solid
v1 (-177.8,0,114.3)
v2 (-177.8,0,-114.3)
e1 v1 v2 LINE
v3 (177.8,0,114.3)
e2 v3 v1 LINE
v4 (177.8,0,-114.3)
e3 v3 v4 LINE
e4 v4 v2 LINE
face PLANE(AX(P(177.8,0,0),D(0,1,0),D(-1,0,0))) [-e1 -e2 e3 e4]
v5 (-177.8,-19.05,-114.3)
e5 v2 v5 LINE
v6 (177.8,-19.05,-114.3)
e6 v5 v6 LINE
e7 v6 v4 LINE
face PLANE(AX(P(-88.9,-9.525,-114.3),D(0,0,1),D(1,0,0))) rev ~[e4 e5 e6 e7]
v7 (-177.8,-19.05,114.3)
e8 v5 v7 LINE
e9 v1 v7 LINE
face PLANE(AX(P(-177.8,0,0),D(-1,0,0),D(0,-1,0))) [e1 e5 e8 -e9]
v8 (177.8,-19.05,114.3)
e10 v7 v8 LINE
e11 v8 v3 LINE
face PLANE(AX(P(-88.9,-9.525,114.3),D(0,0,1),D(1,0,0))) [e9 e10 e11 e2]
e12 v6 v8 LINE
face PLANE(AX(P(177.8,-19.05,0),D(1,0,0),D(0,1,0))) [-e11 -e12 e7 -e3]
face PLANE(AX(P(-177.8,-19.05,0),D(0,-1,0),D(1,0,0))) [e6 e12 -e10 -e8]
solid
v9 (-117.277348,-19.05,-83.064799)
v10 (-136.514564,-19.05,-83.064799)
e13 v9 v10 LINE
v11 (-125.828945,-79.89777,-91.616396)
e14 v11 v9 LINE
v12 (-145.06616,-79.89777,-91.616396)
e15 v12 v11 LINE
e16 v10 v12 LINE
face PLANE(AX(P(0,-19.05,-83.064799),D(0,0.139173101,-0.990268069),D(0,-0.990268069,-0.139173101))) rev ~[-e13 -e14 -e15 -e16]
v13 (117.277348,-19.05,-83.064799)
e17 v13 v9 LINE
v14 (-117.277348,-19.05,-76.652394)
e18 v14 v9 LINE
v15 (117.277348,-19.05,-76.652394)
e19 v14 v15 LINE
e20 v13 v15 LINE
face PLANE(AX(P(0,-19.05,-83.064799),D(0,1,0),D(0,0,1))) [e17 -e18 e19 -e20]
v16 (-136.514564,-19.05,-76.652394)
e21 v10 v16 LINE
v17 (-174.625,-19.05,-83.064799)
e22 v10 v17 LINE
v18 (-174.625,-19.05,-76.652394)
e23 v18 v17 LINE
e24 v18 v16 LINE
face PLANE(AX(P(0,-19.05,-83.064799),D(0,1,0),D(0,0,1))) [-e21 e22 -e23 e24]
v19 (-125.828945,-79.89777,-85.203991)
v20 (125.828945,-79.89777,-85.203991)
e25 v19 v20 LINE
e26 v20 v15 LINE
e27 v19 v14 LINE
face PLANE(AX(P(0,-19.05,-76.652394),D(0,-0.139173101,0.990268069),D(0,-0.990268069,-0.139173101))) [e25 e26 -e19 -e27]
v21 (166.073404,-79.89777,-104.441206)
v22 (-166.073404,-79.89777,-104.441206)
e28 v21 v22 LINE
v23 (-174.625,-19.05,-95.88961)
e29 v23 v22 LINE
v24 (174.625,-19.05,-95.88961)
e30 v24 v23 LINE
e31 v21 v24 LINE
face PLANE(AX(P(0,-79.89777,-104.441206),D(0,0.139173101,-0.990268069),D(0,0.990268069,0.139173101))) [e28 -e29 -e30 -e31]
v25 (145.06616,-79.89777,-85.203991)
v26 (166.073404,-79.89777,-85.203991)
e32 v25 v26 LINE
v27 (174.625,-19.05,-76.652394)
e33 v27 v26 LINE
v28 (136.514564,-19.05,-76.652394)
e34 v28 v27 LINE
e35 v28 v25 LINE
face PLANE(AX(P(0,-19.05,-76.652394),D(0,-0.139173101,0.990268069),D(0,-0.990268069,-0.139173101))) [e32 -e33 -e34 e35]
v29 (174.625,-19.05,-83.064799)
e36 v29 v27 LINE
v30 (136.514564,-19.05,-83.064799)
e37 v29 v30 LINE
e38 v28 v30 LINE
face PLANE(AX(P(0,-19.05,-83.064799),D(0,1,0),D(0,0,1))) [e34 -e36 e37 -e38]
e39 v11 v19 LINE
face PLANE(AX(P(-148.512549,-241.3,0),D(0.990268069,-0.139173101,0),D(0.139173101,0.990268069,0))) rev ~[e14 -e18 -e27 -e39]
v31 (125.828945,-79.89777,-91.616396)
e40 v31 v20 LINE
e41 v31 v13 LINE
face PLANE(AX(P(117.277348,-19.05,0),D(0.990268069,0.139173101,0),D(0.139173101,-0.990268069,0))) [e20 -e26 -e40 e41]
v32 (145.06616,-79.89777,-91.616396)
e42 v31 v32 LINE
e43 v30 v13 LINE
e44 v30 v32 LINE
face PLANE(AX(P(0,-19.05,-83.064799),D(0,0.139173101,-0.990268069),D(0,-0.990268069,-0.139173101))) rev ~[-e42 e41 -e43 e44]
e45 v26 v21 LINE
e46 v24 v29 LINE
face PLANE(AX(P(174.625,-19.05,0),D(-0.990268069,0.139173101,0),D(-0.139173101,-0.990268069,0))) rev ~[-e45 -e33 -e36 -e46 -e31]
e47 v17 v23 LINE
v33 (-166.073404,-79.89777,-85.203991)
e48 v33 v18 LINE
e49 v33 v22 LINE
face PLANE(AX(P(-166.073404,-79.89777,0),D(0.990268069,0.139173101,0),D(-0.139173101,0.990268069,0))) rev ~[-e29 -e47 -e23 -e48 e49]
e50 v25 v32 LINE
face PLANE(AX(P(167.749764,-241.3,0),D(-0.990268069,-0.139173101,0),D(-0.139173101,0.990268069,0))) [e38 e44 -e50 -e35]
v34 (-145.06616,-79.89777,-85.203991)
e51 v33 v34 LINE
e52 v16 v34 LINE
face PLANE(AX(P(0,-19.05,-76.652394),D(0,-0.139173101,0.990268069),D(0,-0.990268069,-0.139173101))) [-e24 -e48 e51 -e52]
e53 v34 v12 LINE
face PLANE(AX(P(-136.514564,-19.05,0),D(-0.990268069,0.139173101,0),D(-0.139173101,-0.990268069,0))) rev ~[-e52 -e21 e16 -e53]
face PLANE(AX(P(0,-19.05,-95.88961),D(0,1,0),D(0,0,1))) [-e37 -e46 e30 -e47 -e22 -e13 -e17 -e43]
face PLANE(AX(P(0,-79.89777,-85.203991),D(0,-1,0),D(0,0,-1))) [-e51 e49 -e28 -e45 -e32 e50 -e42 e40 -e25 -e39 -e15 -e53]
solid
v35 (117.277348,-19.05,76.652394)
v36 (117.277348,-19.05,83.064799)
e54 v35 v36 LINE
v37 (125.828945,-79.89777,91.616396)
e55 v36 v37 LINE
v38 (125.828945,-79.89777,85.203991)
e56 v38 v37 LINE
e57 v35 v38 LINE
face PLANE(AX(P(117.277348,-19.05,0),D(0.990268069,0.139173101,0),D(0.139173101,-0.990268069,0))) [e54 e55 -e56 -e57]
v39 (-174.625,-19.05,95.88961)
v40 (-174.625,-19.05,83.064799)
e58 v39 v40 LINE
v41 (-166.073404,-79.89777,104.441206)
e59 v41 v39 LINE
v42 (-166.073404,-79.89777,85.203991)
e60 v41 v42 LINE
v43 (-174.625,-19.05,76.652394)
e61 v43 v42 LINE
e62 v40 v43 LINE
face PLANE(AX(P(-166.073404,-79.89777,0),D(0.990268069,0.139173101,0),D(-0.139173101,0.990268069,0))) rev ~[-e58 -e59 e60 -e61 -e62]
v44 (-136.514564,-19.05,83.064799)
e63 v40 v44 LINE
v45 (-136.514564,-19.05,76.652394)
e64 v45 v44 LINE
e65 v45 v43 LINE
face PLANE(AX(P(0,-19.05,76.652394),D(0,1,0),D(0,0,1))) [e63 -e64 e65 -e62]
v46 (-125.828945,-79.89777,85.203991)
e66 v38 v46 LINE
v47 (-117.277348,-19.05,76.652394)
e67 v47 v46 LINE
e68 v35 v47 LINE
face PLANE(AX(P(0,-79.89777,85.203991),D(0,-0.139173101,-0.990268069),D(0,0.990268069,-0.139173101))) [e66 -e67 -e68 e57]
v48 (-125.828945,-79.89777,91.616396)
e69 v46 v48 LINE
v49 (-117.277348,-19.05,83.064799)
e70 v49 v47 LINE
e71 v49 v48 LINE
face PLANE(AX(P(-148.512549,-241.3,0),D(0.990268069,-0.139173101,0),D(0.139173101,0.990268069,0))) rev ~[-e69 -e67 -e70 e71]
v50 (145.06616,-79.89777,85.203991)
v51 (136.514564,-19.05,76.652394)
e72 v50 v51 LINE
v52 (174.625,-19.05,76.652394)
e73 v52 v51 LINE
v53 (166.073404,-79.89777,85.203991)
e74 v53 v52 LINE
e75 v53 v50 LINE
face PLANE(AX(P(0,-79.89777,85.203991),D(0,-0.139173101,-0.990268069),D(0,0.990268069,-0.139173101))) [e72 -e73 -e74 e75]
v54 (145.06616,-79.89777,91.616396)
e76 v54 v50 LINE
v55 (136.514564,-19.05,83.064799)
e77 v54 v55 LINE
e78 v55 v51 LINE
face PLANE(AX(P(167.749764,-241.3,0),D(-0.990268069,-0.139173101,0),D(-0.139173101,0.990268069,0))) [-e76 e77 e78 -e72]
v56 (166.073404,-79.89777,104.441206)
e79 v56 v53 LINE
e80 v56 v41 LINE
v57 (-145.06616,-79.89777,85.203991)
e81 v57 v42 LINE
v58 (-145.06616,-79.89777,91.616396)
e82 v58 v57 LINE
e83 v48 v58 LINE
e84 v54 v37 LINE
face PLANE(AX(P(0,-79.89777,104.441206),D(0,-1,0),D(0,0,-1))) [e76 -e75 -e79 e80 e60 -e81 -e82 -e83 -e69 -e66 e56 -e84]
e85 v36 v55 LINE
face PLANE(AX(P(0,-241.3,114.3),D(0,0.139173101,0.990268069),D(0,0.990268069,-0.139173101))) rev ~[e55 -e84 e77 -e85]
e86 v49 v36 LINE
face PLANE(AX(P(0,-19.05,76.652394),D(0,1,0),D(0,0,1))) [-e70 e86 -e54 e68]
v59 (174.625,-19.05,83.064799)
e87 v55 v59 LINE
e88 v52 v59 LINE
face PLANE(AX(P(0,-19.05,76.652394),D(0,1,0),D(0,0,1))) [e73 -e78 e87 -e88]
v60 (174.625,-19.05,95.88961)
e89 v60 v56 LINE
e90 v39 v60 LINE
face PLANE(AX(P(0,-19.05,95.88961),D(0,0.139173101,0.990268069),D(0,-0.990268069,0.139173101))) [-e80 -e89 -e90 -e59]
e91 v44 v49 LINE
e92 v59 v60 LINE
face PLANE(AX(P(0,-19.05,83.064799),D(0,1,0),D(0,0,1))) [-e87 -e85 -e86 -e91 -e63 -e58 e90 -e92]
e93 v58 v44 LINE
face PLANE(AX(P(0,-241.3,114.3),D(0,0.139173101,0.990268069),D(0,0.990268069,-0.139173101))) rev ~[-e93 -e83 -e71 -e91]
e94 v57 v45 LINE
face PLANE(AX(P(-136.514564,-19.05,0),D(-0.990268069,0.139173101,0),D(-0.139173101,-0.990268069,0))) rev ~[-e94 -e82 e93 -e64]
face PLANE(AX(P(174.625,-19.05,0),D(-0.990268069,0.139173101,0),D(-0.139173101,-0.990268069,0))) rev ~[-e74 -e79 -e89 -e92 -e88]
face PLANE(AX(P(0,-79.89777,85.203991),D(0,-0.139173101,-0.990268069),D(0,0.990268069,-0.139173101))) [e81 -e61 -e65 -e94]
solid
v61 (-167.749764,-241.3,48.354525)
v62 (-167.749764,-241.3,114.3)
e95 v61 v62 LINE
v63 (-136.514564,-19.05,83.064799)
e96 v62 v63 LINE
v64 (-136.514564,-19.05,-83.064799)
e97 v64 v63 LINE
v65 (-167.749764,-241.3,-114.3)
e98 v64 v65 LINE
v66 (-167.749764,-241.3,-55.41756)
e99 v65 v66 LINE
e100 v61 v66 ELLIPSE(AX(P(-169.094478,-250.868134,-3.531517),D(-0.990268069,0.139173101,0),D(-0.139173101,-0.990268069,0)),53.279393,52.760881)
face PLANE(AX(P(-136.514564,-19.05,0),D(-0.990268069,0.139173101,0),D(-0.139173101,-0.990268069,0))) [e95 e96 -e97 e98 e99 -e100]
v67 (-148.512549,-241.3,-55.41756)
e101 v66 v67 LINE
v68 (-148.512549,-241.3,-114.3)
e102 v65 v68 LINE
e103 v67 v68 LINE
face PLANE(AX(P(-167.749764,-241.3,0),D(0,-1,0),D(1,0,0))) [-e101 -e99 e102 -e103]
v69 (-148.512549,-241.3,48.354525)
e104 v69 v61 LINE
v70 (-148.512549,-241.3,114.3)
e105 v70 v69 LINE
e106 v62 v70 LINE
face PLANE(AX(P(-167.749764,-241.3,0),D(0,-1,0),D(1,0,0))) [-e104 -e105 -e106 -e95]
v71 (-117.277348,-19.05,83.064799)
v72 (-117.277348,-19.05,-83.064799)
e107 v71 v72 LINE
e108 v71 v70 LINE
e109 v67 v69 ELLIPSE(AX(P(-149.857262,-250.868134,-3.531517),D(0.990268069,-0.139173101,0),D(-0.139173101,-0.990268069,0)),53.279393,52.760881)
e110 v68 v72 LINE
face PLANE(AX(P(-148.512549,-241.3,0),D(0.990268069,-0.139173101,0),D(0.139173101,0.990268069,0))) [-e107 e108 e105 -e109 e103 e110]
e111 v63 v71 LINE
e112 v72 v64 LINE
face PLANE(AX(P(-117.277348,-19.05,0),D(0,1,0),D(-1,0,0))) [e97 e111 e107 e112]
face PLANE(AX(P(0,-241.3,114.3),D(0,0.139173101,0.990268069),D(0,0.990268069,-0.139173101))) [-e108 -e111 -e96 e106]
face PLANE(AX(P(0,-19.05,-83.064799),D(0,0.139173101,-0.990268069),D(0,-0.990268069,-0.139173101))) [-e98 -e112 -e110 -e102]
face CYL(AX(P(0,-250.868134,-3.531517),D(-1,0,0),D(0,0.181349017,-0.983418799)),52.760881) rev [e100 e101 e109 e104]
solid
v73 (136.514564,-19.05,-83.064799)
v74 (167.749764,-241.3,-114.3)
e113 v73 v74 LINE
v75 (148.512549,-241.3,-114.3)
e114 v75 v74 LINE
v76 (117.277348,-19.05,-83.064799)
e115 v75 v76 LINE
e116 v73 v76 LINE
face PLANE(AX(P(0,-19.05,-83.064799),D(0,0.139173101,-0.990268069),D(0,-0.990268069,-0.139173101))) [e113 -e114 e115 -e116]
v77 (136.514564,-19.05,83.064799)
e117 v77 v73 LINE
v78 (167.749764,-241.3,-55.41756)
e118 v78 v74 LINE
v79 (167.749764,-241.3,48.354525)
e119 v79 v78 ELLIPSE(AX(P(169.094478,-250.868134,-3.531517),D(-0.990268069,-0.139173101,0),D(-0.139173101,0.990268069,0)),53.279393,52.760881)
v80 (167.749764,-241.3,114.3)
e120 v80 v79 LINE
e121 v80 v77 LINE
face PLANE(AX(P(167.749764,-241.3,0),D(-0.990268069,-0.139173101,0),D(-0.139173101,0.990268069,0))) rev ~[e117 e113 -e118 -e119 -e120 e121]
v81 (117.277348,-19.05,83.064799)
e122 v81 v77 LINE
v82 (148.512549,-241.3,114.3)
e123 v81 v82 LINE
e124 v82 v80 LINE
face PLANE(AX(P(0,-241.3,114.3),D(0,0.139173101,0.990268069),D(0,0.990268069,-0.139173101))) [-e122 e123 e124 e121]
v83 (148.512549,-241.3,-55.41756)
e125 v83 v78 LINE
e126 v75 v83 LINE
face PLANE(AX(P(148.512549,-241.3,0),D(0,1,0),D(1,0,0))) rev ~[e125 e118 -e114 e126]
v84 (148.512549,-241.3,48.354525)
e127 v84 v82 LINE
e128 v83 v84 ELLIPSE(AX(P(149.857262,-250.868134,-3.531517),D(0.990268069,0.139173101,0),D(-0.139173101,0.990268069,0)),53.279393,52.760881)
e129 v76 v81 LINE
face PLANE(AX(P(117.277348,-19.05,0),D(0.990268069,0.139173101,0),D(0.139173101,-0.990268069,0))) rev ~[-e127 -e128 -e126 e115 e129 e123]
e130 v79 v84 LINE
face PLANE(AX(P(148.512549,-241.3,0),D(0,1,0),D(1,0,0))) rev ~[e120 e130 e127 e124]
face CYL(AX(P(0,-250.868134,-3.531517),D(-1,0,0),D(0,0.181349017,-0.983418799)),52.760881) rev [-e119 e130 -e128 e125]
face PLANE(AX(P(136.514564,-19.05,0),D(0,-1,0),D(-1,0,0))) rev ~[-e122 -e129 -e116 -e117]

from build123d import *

# Parameters (mm, degrees)
F1_DEPTH      = 114.3
F2_DEPTH      = 114.3
F2_DEPTH_BACK = 114.3
F3_DEPTH      = 114.3
F3_DEPTH_BACK = 114.3
F5_DEPTH      = 177.801
F5_DEPTH_BACK = 177.801
F7_DEPTH      = 177.8
F7_DEPTH_BACK = 177.8
F8_DEPTH      = 114.3
F8_DEPTH_BACK = 114.3


# Not quite as in the source:
# - an extrude ends at something that could not be found from the text; its depth is read off the source's solid


with BuildPart() as f1:
    # F0 (on Top) → F1 (new body, symmetric)
    with BuildSketch(Plane.XY):
        Polygon((-177.8, 0), (-177.8, -19.05), (-174.625, -19.05), (-136.5145635031, -19.05), (-117.2773482466, -19.05), (0, -19.05), (0, 0), align=None)
        Polygon((177.8, 0), (0, 0), (0, -19.05), (117.2773482466, -19.05), (136.5145635031, -19.05), (174.625, -19.05), (177.8, -19.05), align=None)
    extrude(amount=F1_DEPTH, both=True)


with BuildPart() as f2:
    # F0 (on Top) → F2 (new body, two sides)
    with BuildSketch(Plane.XY) as f2_sk:
        Polygon((136.5145635031, -19.05), (117.2773482466, -19.05), (125.8289445898, -79.8977696986), (145.0661598463, -79.8977696986), align=None)
        Polygon((145.0661598463, -79.8977696986), (125.8289445898, -79.8977696986), (148.5125487592, -241.3), (167.7497640157, -241.3), align=None)
    extrude(amount=-F2_DEPTH)
    extrude(f2_sk.sketch, amount=F2_DEPTH_BACK)


with BuildPart() as f3:
    # F0 (on Top) → F3 (new body, two sides)
    with BuildSketch(Plane.XY) as f3_sk:
        Polygon((-117.2773482466, -19.05), (-136.5145635031, -19.05), (-145.0661598463, -79.8977696986), (-125.8289445898, -79.8977696986), align=None)
        Polygon((-125.8289445898, -79.8977696986), (-145.0661598463, -79.8977696986), (-167.7497640157, -241.3), (-148.5125487592, -241.3), align=None)
    extrude(amount=F3_DEPTH)
    extrude(f3_sk.sketch, amount=-F3_DEPTH_BACK)


with BuildPart() as f5_tool:
    # F4 (on Right) → F5 (new body, two sides)
    with BuildSketch(Plane.YZ) as f5_sk:
        with BuildLine():
            Line((-241.3, 48.3545251191), (-241.3, -55.417560041))
            ThreePointArc((-241.3, -55.417560041), (-198.1072526182, -3.5315174609), (-241.3, 48.3545251191))
        make_face()
        Polygon((-241.3, -114.2999999998), (-19.05, -114.2999999998), (-19.05, -83.0647994877), align=None)
        Polygon((-241.3, 114.3000000004), (-19.05, 83.0647994877), (-19.05, 114.3000000004), align=None)
    extrude(amount=-F5_DEPTH)
    extrude(f5_sk.sketch, amount=F5_DEPTH_BACK)


with BuildPart() as f2_1:
    add(f2.part)

    # F5: cut by f5_tool
    add(f5_tool.part, mode=Mode.SUBTRACT)


with BuildPart() as f3_1:
    add(f3.part)

    # F5: cut by f5_tool
    add(f5_tool.part, mode=Mode.SUBTRACT)


with BuildPart() as f7:
    # F6 (on Right) → F7 (new body, two sides)
    with BuildSketch(Plane.YZ) as f7_sk:
        Polygon((-19.0500000004, -83.0647994877), (-19.0500000003, -76.6523944022), (-79.8977696986, -85.2039907455), (-79.8977696986, -91.616395831), align=None)
        Polygon((-19.0500000004, -95.8896096587), (-19.0500000004, -83.0647994877), (-79.8977696986, -91.616395831), (-79.8977696986, -104.4412060019), align=None)
    extrude(amount=F7_DEPTH)
    extrude(f7_sk.sketch, amount=-F7_DEPTH_BACK)


with BuildPart() as f7b:
    # F6 (on Right) → F7, piece 2 (new body, two sides)
    with BuildSketch(Plane.YZ) as f7_2_sk:
        Polygon((-19.0499999999, 76.6523944022), (-19.0499999999, 83.0647994877), (-79.8977696986, 91.616395831), (-79.8977696986, 85.2039907455), align=None)
        Polygon((-79.8977696986, 91.616395831), (-19.05, 83.0647994877), (-19.0499999999, 95.8896096587), (-79.8977696986, 104.4412060019), align=None)
    extrude(amount=F7_DEPTH)
    extrude(f7_2_sk.sketch, amount=-F7_DEPTH_BACK)


with BuildPart() as f8_tool:
    # F0 (on Top) → F8 (new body, two sides)
    with BuildSketch(Plane.XY) as f8_sk:
        Polygon((177.8, -79.8977696986), (177.8, -19.05), (174.625, -19.05), (166.0734036568, -79.8977696986), align=None)
        Polygon((-174.625, -19.05), (-177.8, -19.05), (-177.8, -79.8977696986), (-166.0734036568, -79.8977696986), align=None)
    extrude(amount=F8_DEPTH)
    extrude(f8_sk.sketch, amount=-F8_DEPTH_BACK)


with BuildPart() as f7_1:
    add(f7.part)

    # F8: cut by f8_tool
    add(f8_tool.part, mode=Mode.SUBTRACT)

    # F11: cut F2
    add(f2_1.part, mode=Mode.SUBTRACT)

    # F12: cut F3
    add(f3_1.part, mode=Mode.SUBTRACT)


with BuildPart() as f7b_1:
    add(f7b.part)

    # F8: cut by f8_tool
    add(f8_tool.part, mode=Mode.SUBTRACT)

    # F9: cut F3
    add(f3_1.part, mode=Mode.SUBTRACT)

    # F10: cut F2
    add(f2_1.part, mode=Mode.SUBTRACT)


solid = Compound([f1.part, f2_1.part, f3_1.part, f7_1.part, f7b_1.part])
